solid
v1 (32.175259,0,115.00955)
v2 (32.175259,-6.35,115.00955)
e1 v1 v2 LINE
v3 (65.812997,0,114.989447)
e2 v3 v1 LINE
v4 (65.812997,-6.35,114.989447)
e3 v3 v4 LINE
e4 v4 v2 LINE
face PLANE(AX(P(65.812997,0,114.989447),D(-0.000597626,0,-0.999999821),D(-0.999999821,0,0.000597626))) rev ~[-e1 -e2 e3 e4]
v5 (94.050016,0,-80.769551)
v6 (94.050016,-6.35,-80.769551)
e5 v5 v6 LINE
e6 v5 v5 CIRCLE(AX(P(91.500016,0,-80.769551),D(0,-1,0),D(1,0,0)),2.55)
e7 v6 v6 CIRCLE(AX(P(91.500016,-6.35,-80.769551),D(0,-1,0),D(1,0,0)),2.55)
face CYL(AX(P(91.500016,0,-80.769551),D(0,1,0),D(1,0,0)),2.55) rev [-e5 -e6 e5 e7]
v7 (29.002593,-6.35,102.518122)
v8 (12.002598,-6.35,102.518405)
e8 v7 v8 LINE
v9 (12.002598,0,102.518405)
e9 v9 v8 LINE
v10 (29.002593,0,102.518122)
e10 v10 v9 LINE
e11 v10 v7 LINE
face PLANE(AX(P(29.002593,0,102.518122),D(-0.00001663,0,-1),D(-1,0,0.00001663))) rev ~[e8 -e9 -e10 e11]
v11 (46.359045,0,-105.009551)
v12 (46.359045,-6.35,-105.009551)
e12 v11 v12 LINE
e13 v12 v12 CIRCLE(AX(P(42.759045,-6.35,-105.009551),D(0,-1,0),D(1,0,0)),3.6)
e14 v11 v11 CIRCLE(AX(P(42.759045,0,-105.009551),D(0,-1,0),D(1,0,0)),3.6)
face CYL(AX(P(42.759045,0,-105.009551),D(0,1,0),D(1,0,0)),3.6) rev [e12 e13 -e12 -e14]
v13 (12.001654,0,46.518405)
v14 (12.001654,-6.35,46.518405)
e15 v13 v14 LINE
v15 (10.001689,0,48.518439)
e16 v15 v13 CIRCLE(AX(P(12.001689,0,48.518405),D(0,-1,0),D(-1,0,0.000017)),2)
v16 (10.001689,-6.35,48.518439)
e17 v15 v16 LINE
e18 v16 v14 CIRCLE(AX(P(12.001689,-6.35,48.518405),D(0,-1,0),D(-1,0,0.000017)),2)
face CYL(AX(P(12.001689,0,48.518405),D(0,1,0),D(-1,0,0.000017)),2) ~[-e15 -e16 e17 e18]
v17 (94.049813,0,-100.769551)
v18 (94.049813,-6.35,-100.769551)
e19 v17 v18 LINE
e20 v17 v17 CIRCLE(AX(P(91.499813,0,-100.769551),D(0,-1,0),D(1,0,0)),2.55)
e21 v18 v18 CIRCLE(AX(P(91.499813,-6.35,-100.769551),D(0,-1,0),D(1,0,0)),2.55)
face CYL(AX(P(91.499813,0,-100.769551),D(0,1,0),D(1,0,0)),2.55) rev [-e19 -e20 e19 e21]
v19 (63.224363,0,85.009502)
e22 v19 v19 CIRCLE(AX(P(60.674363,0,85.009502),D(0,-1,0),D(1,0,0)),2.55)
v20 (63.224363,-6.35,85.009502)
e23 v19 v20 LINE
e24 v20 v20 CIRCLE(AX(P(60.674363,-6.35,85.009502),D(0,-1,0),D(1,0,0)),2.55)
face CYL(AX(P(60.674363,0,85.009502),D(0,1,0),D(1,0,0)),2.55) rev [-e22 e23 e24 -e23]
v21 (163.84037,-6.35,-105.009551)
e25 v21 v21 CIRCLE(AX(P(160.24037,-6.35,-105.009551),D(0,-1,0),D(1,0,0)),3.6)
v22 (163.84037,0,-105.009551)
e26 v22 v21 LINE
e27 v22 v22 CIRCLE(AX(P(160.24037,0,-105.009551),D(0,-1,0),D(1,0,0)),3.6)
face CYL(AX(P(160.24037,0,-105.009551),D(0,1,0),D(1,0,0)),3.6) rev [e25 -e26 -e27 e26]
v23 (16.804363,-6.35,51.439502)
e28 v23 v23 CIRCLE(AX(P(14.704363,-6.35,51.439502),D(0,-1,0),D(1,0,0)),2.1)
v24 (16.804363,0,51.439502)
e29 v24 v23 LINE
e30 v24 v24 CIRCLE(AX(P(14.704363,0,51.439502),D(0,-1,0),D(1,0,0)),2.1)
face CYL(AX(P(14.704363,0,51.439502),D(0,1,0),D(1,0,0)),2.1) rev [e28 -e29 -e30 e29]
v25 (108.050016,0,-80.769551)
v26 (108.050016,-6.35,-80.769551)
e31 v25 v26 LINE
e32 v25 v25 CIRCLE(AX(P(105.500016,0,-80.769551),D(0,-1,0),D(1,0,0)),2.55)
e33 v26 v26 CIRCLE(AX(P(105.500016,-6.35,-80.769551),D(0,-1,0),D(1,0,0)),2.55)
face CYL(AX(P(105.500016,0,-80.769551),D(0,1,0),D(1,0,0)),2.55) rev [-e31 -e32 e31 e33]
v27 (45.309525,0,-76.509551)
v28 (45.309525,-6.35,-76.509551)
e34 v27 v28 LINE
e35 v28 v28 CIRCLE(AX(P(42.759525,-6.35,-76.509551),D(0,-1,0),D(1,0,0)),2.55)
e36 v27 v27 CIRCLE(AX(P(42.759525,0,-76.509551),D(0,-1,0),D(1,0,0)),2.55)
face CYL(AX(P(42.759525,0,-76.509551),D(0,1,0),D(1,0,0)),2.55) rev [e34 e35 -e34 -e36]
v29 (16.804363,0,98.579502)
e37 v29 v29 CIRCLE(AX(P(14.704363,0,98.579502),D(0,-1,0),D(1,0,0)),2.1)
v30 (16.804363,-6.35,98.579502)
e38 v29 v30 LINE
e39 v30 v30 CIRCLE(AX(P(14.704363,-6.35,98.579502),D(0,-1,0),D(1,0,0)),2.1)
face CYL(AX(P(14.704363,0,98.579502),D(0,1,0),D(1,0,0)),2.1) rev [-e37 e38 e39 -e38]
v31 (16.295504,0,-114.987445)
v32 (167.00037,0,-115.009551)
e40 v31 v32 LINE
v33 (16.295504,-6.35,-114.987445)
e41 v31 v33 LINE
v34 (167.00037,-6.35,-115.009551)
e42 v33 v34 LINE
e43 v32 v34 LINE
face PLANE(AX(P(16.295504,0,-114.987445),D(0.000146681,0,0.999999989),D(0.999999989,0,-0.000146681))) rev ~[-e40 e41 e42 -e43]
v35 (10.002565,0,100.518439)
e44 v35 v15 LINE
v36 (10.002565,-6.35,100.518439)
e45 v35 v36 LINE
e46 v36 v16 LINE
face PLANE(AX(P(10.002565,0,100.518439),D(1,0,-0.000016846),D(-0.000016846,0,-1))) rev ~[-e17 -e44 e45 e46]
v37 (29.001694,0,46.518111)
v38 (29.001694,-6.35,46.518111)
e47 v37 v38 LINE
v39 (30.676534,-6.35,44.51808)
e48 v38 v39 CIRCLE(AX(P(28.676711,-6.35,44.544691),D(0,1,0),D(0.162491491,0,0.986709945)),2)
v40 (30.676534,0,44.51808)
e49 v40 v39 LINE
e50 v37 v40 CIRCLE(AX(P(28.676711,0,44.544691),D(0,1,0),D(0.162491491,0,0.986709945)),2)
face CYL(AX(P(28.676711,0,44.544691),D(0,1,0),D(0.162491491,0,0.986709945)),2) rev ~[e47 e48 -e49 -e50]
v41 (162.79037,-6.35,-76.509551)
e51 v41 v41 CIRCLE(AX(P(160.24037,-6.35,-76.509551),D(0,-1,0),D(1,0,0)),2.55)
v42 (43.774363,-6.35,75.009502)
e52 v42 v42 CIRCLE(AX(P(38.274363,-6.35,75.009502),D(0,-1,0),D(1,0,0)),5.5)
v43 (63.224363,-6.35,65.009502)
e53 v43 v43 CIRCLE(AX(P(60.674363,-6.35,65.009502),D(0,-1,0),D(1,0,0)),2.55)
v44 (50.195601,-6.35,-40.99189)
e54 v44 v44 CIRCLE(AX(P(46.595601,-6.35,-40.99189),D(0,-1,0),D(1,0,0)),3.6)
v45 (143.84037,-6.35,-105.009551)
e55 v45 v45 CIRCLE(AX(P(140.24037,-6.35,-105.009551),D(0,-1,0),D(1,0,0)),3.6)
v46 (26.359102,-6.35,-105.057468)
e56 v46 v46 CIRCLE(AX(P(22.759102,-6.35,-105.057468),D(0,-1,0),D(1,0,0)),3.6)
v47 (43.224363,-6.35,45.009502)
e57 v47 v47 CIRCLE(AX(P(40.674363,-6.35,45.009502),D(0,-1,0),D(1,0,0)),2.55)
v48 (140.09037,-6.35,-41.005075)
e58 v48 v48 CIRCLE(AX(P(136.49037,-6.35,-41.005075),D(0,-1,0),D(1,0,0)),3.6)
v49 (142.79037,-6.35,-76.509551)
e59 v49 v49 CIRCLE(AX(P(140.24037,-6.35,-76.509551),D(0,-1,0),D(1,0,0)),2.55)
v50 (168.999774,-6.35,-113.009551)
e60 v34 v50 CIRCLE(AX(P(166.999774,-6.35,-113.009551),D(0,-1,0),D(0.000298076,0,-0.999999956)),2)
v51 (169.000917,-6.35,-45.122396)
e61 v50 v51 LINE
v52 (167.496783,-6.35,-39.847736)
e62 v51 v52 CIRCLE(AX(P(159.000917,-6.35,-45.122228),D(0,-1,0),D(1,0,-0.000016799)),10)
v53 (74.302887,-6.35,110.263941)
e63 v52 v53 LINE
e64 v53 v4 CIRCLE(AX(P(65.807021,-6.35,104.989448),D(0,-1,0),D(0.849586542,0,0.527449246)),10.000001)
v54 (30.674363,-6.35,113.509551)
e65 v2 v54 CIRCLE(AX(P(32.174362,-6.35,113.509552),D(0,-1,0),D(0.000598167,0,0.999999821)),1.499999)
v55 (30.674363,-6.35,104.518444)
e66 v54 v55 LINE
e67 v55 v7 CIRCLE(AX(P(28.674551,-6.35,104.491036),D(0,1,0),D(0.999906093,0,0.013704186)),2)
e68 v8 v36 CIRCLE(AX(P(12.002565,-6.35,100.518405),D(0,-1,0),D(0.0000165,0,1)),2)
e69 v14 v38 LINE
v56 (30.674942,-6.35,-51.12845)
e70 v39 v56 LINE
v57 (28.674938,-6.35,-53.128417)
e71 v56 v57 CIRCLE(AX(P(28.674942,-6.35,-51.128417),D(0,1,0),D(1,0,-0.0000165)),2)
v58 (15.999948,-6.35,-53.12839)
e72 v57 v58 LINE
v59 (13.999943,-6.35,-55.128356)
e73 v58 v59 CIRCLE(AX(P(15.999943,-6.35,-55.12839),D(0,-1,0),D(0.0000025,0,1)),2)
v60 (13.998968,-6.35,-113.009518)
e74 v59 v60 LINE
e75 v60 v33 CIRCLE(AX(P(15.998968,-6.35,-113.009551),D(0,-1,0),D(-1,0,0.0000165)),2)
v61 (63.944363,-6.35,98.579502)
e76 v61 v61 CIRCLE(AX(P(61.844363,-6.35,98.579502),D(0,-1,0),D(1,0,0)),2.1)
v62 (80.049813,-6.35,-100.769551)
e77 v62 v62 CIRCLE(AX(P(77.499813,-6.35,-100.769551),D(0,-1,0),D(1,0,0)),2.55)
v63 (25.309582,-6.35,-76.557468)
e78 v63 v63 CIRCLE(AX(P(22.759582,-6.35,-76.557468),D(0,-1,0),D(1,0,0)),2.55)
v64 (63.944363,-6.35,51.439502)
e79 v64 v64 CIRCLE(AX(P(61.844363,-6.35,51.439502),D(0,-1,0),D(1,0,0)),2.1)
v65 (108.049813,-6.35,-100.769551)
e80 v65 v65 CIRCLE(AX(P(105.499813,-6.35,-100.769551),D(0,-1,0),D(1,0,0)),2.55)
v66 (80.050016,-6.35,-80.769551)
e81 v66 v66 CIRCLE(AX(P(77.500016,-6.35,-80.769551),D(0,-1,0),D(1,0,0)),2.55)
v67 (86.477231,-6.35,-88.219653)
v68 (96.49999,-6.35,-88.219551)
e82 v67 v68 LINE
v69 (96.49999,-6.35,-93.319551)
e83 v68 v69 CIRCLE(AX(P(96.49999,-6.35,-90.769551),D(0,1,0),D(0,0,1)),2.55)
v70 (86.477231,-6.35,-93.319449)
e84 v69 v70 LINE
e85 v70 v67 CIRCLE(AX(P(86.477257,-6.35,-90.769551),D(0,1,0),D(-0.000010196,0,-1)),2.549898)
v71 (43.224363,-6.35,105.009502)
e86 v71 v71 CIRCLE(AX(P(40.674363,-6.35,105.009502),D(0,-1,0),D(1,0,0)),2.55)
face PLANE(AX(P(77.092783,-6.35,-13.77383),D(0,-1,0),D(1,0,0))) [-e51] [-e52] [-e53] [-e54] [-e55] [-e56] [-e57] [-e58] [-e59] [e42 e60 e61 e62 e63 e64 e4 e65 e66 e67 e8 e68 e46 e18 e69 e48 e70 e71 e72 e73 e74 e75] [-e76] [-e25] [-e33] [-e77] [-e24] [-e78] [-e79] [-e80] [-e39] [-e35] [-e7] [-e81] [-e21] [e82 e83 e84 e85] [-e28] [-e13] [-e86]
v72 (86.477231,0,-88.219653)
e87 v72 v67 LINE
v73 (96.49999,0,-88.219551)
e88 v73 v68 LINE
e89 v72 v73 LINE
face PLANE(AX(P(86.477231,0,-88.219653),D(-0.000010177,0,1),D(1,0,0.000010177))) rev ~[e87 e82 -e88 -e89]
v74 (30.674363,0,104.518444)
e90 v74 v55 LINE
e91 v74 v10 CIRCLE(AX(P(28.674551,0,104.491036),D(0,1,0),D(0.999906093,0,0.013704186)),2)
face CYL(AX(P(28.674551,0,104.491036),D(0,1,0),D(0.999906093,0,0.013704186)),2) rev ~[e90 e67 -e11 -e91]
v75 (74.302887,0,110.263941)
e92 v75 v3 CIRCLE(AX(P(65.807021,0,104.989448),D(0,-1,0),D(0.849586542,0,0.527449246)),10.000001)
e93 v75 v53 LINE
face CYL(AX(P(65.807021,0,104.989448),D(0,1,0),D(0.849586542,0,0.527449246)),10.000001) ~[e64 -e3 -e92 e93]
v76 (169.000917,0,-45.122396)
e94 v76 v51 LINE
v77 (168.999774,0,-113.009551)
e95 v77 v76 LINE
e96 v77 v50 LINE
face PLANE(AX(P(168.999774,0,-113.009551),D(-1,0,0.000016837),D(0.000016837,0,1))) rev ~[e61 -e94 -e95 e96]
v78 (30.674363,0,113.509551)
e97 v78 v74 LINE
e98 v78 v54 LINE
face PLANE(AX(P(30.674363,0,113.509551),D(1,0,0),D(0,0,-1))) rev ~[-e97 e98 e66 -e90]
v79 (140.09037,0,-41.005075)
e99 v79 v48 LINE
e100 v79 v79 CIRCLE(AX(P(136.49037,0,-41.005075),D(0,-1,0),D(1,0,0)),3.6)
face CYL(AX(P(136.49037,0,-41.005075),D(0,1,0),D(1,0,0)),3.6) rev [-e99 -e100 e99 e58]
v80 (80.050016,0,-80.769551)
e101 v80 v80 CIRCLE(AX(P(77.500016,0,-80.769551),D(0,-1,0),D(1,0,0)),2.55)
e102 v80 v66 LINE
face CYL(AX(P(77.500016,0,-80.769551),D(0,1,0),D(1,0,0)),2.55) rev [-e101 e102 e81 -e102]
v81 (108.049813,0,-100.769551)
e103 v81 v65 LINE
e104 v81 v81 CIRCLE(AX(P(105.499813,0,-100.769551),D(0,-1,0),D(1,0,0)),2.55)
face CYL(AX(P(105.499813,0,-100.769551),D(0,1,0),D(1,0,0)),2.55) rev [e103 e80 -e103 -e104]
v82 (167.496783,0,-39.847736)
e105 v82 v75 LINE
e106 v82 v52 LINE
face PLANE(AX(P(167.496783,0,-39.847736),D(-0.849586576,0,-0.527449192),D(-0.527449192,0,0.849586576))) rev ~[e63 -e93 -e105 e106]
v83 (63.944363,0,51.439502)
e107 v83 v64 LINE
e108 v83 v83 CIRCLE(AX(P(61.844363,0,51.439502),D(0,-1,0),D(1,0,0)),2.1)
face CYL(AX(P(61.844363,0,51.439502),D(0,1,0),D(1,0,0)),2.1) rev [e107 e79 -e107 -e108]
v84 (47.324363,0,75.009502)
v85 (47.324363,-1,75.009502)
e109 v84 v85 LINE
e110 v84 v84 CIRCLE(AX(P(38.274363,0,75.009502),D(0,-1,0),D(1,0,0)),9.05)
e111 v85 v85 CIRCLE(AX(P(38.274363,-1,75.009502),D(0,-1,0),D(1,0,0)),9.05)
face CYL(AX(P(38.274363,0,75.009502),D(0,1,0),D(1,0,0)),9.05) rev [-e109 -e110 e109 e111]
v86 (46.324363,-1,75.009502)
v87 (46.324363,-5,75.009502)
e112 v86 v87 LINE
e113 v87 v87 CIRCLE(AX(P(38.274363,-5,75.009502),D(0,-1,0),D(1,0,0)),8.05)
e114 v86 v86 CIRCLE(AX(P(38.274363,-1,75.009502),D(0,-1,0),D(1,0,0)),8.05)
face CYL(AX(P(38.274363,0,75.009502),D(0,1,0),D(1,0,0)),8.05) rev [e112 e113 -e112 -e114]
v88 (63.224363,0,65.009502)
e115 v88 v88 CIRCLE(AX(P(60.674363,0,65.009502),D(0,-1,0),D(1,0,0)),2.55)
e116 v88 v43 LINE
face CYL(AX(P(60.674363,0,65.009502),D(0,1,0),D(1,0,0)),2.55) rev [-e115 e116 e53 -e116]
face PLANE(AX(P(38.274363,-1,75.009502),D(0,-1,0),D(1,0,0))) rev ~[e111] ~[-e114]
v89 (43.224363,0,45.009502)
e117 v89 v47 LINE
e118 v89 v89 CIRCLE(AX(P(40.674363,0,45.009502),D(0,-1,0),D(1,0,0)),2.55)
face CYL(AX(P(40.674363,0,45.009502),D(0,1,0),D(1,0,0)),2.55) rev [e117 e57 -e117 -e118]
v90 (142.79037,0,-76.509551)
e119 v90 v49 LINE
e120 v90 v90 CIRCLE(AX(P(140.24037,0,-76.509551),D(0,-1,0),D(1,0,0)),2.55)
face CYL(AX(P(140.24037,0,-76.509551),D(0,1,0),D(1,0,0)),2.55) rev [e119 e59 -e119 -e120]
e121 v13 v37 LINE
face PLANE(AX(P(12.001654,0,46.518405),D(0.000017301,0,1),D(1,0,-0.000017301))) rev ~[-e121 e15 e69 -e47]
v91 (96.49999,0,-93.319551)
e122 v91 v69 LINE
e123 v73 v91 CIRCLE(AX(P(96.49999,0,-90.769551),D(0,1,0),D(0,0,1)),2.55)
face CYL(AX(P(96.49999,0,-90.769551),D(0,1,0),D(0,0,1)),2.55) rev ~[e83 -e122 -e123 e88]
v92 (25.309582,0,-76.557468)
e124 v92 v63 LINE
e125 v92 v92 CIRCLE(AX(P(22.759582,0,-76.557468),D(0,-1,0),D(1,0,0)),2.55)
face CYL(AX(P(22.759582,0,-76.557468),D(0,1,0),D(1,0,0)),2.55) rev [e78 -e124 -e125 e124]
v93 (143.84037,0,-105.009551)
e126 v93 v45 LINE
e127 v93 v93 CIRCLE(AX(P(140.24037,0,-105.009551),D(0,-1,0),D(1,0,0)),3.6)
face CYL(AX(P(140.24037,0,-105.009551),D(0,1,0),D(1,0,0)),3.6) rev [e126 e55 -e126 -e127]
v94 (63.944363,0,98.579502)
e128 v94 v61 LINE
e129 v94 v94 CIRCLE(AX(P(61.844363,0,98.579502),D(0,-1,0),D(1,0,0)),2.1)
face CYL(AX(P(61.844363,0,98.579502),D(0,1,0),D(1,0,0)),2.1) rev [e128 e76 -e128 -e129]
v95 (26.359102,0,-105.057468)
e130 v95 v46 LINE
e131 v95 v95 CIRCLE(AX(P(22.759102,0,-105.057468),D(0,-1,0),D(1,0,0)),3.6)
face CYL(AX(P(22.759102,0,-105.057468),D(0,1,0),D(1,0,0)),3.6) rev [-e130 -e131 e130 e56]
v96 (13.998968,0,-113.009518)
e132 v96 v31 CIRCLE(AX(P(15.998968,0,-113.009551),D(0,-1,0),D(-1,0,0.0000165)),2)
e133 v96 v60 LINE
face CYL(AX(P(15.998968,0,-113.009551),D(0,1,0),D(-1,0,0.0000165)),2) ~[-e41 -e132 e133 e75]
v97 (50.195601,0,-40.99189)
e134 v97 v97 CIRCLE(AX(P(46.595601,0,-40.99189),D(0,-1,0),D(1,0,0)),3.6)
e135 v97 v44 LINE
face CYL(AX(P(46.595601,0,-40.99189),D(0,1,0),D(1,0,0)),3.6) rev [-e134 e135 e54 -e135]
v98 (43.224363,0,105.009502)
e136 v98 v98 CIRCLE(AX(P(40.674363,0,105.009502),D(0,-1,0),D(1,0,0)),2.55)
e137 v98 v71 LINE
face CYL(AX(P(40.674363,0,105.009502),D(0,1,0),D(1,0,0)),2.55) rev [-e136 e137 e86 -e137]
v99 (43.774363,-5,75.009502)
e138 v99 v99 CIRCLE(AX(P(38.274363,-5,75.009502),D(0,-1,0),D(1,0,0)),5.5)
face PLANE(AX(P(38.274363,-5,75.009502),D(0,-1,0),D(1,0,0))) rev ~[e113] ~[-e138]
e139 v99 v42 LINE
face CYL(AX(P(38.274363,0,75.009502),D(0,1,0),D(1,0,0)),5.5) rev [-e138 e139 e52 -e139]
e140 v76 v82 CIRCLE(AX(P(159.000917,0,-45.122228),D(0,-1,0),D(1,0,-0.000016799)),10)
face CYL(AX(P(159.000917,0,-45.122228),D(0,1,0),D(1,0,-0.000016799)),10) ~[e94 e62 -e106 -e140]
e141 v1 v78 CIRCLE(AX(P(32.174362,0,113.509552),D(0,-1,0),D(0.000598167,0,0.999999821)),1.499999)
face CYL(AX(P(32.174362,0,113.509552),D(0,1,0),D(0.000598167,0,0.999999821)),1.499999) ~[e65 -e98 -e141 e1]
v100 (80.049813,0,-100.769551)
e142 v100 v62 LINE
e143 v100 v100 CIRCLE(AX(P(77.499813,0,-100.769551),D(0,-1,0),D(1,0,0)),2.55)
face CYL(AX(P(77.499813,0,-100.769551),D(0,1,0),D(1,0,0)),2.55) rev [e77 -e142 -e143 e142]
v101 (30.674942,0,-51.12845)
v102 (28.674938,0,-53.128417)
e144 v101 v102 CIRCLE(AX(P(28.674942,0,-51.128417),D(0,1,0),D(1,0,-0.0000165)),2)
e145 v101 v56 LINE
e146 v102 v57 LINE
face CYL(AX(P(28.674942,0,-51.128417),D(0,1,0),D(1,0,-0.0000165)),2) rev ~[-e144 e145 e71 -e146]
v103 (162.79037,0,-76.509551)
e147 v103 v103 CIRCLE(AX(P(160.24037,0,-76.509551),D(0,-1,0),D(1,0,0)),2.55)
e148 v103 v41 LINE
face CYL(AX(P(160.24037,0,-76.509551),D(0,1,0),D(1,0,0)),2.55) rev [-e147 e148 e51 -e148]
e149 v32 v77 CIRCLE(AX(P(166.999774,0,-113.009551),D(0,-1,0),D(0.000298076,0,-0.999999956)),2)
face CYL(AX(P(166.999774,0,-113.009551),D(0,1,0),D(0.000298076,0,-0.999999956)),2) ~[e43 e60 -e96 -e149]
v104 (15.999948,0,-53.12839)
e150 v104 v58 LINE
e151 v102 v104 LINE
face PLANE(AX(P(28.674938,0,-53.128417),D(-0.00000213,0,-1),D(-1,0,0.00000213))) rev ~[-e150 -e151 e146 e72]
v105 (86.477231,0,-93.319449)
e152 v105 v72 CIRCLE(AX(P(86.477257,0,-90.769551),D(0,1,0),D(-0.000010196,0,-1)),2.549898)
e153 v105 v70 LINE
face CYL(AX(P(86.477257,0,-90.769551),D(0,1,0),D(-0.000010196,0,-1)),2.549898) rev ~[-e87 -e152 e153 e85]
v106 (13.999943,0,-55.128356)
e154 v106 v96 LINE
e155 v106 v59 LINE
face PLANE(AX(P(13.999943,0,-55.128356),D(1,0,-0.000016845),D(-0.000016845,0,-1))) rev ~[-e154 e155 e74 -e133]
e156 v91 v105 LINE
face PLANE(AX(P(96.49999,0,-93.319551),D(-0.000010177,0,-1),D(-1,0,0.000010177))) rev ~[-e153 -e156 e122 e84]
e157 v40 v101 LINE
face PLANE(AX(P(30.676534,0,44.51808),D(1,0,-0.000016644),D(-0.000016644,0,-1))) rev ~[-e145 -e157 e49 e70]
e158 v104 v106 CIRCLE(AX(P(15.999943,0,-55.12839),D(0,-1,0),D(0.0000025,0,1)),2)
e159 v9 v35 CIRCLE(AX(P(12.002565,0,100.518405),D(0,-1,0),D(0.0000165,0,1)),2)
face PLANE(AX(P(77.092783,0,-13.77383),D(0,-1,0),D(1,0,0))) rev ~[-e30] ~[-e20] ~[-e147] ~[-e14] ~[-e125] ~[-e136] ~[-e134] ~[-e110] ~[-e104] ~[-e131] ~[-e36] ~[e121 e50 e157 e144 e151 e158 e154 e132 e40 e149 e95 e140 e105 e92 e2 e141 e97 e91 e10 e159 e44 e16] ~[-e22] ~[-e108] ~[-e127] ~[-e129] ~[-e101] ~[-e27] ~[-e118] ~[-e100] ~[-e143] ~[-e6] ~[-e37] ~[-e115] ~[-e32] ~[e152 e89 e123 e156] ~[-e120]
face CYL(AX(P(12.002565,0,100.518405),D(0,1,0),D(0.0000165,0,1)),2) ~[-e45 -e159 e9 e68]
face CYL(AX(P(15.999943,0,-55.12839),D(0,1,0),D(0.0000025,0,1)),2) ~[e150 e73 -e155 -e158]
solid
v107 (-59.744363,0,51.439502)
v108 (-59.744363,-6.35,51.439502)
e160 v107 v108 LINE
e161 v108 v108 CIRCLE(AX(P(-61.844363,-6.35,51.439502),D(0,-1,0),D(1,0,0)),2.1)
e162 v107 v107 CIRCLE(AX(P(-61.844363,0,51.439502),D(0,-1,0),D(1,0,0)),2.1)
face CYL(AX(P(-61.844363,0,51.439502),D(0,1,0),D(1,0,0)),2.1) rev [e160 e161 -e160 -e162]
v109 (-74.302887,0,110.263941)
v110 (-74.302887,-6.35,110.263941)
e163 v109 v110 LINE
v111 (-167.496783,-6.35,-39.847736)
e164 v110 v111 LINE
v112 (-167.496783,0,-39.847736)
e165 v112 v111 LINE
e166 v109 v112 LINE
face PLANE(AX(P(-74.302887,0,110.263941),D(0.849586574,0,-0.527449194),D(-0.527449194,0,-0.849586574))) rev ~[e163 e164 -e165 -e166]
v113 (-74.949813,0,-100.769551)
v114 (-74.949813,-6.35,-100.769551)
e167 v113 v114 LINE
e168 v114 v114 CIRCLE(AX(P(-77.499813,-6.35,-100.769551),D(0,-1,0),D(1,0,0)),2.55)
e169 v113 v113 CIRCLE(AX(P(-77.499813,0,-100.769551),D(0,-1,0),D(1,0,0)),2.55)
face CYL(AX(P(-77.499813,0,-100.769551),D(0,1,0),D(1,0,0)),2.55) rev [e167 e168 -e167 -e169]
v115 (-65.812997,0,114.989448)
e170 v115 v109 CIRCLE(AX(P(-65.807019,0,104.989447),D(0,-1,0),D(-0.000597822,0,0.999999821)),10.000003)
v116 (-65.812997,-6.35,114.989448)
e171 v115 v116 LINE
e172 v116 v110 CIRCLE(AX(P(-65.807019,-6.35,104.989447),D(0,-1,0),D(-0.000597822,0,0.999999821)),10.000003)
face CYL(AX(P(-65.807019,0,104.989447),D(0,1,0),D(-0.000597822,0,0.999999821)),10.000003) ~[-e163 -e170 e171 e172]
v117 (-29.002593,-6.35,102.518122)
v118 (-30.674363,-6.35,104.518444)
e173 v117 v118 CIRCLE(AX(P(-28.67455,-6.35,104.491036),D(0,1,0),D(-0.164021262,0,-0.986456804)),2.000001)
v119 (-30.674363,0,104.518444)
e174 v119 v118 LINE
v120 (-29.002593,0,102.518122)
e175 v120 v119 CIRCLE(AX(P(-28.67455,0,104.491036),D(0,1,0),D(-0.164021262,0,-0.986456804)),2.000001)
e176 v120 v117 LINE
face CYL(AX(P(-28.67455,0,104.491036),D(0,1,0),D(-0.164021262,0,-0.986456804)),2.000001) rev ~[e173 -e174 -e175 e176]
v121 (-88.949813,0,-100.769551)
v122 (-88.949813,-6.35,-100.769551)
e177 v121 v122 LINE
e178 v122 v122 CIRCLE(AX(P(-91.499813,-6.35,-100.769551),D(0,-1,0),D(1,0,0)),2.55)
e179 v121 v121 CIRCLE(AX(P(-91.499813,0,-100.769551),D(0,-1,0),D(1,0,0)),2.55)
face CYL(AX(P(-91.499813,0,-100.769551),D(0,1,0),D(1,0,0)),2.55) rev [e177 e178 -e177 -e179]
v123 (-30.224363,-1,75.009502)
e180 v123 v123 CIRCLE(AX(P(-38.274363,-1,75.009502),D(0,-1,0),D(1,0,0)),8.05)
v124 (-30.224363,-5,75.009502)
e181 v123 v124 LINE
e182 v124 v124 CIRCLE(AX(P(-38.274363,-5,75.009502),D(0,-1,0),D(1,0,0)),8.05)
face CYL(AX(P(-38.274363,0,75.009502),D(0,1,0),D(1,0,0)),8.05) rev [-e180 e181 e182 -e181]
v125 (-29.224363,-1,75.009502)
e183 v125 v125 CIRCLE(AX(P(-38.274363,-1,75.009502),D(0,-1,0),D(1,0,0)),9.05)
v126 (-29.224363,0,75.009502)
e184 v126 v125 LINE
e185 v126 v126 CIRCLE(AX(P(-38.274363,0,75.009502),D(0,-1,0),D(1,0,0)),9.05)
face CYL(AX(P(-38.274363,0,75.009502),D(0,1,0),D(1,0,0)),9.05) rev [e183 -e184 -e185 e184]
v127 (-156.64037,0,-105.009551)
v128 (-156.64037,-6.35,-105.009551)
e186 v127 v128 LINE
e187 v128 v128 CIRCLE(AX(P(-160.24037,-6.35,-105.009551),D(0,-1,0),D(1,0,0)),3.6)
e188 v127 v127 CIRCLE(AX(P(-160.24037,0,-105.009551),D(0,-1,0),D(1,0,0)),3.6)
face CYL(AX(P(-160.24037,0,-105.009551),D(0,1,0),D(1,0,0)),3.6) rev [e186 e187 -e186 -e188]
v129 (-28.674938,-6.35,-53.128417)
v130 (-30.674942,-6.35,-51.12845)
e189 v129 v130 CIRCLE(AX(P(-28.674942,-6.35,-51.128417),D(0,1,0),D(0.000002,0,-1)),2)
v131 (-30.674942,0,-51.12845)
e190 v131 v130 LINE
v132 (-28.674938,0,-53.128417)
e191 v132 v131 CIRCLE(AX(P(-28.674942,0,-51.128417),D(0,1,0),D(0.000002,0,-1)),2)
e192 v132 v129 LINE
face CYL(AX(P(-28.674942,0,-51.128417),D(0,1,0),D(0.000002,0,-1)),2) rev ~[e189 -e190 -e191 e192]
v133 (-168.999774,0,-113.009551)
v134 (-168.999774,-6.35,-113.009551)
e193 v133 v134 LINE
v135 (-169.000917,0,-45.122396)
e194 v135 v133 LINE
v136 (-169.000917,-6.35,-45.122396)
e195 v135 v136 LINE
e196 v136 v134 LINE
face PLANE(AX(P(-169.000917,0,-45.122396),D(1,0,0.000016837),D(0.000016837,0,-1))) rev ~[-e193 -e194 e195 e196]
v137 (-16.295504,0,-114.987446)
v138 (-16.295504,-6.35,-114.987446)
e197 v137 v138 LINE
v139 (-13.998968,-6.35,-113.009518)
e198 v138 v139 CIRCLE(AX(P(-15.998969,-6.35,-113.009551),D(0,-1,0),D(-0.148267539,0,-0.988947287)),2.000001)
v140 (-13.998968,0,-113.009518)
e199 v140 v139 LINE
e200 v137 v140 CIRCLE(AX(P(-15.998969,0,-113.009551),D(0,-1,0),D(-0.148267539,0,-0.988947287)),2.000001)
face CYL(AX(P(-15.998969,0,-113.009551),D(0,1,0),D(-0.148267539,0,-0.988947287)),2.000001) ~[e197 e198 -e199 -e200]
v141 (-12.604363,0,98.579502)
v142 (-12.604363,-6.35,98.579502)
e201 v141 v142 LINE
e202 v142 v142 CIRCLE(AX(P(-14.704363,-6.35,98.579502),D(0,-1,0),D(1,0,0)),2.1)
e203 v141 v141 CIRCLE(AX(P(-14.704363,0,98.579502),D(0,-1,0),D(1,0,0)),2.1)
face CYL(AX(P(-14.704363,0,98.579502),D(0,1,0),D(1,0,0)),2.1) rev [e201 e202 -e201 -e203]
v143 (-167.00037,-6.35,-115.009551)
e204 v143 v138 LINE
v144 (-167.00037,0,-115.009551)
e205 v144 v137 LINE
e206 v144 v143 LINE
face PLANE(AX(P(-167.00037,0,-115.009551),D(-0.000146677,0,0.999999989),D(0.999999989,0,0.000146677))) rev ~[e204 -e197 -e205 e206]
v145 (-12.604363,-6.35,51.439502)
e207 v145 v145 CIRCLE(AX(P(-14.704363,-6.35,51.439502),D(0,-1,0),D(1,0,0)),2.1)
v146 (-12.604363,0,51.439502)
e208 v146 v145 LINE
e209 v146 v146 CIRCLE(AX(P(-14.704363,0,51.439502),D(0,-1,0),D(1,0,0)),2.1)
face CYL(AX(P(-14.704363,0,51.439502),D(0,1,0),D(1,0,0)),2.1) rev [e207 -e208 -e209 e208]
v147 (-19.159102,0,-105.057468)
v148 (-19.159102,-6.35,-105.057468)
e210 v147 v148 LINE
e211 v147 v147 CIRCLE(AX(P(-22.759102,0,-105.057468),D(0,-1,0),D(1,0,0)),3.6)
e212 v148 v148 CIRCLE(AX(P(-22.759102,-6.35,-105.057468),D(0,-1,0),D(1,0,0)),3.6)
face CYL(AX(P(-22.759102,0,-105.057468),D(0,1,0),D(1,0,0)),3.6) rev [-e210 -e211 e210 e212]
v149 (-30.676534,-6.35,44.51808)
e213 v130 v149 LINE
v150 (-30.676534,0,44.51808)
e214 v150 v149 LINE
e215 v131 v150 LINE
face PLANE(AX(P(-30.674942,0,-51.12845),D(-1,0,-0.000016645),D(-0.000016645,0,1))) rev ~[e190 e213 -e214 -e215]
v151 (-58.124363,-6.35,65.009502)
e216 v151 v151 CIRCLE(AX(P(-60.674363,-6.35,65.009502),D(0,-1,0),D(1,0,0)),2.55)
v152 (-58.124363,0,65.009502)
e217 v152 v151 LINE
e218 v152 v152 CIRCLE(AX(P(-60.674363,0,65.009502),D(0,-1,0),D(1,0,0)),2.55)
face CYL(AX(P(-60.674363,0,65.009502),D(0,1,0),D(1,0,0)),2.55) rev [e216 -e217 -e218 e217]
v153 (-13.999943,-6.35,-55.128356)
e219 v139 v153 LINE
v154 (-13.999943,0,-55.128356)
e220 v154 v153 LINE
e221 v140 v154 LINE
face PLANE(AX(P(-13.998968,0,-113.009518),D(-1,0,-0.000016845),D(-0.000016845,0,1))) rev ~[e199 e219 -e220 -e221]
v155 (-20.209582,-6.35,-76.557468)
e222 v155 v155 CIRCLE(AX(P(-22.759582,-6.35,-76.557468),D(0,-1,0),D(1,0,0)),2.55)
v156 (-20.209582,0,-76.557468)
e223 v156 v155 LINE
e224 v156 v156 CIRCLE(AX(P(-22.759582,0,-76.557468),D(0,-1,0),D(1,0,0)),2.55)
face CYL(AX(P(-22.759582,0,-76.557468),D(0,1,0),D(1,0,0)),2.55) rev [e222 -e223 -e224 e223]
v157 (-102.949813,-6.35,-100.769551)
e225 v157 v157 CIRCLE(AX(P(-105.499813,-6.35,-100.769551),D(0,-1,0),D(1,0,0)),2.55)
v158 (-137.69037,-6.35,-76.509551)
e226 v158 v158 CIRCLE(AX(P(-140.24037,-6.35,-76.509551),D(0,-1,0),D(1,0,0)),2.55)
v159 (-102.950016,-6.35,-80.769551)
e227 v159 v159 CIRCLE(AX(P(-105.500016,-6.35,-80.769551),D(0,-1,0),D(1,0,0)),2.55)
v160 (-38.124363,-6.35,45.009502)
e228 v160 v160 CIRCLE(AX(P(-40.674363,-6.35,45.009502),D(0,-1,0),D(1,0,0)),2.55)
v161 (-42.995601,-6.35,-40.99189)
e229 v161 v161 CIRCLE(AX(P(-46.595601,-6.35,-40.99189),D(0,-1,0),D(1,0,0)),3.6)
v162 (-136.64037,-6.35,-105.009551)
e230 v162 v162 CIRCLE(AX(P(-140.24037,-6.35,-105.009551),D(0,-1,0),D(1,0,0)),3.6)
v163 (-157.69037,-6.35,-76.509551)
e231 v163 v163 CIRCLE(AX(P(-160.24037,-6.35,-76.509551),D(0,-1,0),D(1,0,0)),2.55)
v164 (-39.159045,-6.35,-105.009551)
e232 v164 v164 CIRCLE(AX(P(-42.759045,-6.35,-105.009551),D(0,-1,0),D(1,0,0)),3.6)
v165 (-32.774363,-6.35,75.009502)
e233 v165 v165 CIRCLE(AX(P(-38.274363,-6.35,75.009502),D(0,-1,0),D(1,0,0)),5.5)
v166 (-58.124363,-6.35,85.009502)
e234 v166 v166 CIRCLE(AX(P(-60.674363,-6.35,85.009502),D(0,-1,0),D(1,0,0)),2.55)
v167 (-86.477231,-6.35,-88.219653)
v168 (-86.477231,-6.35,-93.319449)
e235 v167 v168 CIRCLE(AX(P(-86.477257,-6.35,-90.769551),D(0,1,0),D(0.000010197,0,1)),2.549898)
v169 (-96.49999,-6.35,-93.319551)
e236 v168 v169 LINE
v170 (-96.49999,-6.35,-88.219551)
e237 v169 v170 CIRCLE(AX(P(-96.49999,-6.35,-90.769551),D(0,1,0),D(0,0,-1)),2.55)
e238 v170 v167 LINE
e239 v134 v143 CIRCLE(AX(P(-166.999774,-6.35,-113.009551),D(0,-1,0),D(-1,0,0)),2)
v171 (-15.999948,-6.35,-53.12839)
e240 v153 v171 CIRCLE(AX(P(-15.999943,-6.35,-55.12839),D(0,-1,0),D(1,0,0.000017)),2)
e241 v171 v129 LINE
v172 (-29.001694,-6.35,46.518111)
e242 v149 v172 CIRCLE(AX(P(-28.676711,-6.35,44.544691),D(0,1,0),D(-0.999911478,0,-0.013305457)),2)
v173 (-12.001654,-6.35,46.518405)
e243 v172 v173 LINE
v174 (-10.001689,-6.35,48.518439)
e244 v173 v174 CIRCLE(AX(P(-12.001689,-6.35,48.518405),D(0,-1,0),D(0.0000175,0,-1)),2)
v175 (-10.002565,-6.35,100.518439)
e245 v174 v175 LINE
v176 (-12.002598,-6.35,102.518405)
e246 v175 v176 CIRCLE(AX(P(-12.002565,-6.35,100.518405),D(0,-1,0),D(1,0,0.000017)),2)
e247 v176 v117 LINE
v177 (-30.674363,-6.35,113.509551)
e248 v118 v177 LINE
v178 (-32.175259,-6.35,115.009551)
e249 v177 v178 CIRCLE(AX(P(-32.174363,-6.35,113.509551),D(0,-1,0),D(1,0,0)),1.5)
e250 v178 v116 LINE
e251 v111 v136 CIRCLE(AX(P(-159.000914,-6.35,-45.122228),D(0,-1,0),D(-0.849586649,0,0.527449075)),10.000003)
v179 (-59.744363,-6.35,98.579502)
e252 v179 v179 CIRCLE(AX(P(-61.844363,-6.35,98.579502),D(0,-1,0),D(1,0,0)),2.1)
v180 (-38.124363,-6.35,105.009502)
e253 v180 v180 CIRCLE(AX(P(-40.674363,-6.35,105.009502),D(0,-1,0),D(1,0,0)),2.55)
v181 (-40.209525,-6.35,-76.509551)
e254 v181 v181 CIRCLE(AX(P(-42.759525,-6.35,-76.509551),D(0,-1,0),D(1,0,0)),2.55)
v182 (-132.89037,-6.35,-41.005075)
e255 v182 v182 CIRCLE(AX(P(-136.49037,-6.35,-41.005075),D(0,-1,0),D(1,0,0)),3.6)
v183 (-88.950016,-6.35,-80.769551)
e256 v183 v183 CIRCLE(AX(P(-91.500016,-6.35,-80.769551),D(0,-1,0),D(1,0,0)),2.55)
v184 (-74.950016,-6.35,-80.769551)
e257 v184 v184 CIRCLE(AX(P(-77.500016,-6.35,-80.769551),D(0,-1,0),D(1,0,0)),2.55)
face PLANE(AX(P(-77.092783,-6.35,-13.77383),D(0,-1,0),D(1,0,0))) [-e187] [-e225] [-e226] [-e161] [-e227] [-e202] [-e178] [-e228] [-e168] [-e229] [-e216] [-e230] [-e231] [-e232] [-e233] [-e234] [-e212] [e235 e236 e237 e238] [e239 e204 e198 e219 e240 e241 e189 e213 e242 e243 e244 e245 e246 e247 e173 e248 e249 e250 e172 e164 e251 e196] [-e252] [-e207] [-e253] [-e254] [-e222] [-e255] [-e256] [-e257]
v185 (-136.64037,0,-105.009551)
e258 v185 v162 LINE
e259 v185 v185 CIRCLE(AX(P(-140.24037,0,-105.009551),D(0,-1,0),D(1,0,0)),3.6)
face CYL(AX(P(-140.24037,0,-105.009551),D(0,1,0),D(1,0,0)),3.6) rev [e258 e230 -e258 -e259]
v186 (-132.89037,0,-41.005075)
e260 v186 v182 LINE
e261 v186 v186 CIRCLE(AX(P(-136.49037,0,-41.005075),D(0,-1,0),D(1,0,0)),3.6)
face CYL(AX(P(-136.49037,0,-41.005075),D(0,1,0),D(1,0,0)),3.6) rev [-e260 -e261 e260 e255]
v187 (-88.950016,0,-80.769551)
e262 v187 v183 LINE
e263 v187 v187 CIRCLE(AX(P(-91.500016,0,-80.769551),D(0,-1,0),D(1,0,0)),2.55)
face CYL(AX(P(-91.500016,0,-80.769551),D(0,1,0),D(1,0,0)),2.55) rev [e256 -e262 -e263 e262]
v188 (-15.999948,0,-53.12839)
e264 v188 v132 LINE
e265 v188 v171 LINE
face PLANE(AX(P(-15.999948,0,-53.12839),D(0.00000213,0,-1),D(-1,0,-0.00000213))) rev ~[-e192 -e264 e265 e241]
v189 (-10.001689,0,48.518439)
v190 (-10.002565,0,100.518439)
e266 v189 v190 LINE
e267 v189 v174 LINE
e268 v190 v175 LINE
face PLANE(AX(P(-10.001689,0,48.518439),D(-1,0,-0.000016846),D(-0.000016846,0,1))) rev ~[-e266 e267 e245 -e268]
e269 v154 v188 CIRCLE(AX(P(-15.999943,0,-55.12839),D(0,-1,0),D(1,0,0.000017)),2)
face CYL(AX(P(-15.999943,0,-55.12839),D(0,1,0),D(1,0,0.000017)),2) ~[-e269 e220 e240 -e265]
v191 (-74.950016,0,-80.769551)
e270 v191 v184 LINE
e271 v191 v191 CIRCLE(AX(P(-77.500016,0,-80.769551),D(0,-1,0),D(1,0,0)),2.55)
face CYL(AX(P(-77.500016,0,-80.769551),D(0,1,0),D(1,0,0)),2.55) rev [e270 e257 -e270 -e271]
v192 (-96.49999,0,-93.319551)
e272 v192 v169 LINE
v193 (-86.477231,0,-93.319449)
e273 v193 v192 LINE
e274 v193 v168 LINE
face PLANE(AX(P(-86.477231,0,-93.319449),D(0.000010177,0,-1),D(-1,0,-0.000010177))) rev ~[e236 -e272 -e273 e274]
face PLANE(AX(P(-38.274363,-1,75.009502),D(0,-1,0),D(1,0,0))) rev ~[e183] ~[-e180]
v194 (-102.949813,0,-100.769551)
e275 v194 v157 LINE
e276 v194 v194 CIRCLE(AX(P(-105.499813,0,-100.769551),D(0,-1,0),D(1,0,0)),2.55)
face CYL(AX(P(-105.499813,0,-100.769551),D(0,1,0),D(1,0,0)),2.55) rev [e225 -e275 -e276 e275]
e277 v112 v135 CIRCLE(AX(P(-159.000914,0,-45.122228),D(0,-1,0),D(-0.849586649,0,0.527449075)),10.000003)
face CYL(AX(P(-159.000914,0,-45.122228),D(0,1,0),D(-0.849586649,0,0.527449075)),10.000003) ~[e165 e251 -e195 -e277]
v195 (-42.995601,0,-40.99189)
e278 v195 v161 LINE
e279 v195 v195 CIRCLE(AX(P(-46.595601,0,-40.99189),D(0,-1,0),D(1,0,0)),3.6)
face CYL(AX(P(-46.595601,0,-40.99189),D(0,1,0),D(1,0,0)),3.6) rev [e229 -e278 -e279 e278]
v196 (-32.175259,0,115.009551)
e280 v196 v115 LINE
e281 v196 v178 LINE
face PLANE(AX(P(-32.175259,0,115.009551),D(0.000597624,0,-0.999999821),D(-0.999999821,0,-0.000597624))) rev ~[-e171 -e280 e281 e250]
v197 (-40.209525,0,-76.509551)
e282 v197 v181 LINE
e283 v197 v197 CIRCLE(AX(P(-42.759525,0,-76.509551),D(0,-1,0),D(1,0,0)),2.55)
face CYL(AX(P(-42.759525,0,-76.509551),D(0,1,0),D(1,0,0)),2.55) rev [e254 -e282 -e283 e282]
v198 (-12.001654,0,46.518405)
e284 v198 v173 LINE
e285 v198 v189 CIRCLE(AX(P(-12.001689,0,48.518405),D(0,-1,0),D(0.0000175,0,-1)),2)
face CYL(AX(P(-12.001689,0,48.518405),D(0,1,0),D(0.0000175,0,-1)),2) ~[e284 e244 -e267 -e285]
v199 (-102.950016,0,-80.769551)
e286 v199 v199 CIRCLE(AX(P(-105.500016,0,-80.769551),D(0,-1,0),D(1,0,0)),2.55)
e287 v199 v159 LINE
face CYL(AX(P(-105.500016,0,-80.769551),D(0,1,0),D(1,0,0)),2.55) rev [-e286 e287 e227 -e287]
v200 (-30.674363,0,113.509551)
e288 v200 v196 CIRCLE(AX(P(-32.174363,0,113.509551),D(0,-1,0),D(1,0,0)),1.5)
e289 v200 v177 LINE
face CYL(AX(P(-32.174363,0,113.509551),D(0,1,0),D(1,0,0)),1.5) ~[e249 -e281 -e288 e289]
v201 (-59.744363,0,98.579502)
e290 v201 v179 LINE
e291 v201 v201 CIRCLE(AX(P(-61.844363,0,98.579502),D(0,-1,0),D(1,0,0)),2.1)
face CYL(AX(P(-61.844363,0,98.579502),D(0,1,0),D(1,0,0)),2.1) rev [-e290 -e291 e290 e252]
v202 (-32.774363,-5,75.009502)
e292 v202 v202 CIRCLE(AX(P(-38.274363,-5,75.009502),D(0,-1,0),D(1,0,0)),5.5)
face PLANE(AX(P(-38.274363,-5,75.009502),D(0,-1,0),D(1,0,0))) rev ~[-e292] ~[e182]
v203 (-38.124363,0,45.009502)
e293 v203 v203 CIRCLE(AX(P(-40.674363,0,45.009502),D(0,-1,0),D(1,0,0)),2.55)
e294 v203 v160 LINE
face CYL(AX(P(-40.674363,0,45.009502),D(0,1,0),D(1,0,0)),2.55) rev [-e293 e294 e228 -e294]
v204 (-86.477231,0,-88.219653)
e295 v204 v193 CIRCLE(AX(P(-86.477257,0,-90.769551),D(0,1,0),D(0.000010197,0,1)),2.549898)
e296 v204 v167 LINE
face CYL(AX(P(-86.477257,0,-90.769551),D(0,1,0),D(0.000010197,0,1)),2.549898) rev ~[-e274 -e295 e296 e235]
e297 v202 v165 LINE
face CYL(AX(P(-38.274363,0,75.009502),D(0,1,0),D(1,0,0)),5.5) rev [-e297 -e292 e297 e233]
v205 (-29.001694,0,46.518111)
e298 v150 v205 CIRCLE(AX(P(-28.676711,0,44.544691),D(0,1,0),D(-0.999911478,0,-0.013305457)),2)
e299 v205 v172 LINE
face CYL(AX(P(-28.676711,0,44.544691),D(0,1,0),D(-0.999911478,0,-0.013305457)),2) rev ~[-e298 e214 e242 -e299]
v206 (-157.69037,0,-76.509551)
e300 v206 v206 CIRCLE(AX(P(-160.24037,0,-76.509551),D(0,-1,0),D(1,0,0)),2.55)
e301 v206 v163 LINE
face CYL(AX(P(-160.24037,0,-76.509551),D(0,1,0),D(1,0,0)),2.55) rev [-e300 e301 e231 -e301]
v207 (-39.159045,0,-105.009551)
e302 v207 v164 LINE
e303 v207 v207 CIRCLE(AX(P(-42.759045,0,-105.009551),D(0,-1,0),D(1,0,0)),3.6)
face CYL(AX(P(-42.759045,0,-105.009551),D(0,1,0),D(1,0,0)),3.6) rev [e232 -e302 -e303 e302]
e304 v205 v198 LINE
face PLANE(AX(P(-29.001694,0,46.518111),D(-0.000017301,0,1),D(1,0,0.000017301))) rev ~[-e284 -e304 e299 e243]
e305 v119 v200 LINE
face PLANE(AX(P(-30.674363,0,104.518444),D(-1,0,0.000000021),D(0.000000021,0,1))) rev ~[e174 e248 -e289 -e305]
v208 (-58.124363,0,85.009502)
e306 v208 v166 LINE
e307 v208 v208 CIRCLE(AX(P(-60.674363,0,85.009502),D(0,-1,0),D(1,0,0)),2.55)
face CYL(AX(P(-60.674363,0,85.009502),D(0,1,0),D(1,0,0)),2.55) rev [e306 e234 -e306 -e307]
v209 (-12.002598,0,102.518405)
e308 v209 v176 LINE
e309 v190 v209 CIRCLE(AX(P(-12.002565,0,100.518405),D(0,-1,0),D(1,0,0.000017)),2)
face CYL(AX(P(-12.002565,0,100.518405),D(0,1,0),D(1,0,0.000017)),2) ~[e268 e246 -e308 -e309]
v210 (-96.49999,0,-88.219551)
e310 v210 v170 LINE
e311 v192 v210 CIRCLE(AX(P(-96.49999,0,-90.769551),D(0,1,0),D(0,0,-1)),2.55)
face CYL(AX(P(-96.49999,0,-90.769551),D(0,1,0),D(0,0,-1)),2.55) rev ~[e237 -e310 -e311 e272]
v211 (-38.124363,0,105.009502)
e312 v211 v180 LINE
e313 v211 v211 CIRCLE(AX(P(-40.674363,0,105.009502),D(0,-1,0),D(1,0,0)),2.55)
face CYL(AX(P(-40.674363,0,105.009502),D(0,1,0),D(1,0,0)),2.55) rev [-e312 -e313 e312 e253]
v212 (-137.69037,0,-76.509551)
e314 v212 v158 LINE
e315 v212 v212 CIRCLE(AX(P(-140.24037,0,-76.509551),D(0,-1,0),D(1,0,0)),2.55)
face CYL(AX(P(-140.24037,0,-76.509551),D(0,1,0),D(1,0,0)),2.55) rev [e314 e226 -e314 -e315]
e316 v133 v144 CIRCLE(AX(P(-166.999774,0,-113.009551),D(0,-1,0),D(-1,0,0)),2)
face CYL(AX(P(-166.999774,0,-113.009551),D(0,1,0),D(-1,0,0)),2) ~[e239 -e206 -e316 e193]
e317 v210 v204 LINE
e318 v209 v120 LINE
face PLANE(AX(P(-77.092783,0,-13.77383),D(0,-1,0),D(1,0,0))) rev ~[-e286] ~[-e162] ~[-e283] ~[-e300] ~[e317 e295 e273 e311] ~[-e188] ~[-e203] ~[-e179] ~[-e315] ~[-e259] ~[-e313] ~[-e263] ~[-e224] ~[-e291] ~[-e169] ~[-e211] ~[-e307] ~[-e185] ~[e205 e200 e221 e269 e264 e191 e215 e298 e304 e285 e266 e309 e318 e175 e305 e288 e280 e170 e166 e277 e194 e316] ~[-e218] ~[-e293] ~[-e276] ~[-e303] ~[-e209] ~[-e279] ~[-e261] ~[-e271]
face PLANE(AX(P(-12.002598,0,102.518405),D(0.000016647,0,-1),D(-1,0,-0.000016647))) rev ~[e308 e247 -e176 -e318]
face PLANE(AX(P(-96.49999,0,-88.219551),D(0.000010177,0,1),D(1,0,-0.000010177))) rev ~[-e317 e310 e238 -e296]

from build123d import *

# Parameters (mm, degrees)
F0_R     = 3.6
F0_R_2   = 2.55
F0_R_3   = 2.1
F0_R_4   = 9.05
F0_R_5   = 8.05
F0_R_6   = 5.5
F1_DEPTH = 6.35
F2_DEPTH = 5
F3_DEPTH = 1
F4_DEPTH = 6.35
F5_DEPTH = 5
F6_DEPTH = 1


# Not quite as in the source:
# - ends of sketch curves that miss each other by under 0.0002 mm in the source are joined


with BuildPart() as f1:
    # F0 (on Front) → F1 (new body)
    with BuildSketch(Plane.XZ):
        with BuildLine():
            Line((-30.674942, -51.12845), (-30.676534, 44.51808))
            ThreePointArc((-30.676534, 44.51808), (-30.2100770853, 45.8287425755), (-29.0016939819, 46.5181108898))
            Line((-29.0016939819, 46.5181108898), (-12.001654, 46.518405))
            ThreePointArc((-12.001654, 46.518405), (-10.5874510427, 47.104215833), (-10.0016890003, 48.518439))
            Line((-10.0016890003, 48.518439), (-10.002565, 100.518439))
            ThreePointArc((-10.002565, 100.518439), (-10.5883751259, 101.9326422503), (-12.002598, 102.5184049997))
            Line((-12.002598, 102.5184049997), (-29.002593, 102.518122))
            ThreePointArc((-29.002593, 102.518122), (-30.2091675508, 103.2084791623), (-30.6743631915, 104.5184440026))
            Line((-30.6743631915, 104.5184440026), (-30.674363, 113.509551))
            ThreePointArc((-30.674363, 113.509551), (-31.1140196595, 114.5705279085), (-32.1752590004, 115.0095507324))
            Line((-32.1752590004, 115.0095507324), (-65.812997, 114.989448))
            ThreePointArc((-65.812997, 114.989448), (-70.670448907, 113.7271299849), (-74.3028867898, 110.2639408695))
            Line((-74.3028867898, 110.2639408695), (-167.496783, -39.847736))
            ThreePointArc((-167.496783, -39.847736), (-168.6175573697, -42.3799245887), (-169.0009169986, -45.122396))
            Line((-169.0009169986, -45.122396), (-168.999774, -113.009551))
            ThreePointArc((-168.999774, -113.009551), (-168.4141982645, -114.4235538289), (-167.00037, -115.0095509112))
            Line((-167.00037, -115.0095509112), (-16.295504, -114.987446))
            ThreePointArc((-16.295504, -114.987446), (-14.6937872777, -114.5249728165), (-13.9989680003, -113.009518))
            Line((-13.9989680003, -113.009518), (-13.999943, -55.128356))
            ThreePointArc((-13.999943, -55.128356), (-14.5857432263, -53.7141626491), (-15.999948, -53.12839))
            Line((-15.999948, -53.12839), (-28.674938, -53.128417))
            ThreePointArc((-28.674938, -53.128417), (-30.0891424808, -52.5426436438), (-30.674942, -51.12845))
        make_face()
        with Locations((-160.24037, -105.009551)):
            Circle(F0_R, mode=Mode.SUBTRACT)
        with Locations((-140.24037, -105.009551)):
            Circle(F0_R, mode=Mode.SUBTRACT)
        with Locations((-105.499813, -100.769551)):
            Circle(F0_R_2, mode=Mode.SUBTRACT)
        with Locations((-91.499813, -100.769551)):
            Circle(F0_R_2, mode=Mode.SUBTRACT)
        with BuildLine():
            Line((-96.49999, -88.219551), (-86.477231, -88.219653))
            ThreePointArc((-86.477231, -88.219653), (-83.927359, -90.769551), (-86.477231, -93.3194489999))
            Line((-86.477231, -93.3194489999), (-96.49999, -93.319551))
            ThreePointArc((-96.49999, -93.319551), (-99.04999, -90.769551), (-96.49999, -88.219551))
        make_face(mode=Mode.SUBTRACT)
        with Locations((-160.24037, -76.509551)):
            Circle(F0_R_2, mode=Mode.SUBTRACT)
        with Locations((-140.24037, -76.509551)):
            Circle(F0_R_2, mode=Mode.SUBTRACT)
        with Locations((-105.500016, -80.769551)):
            Circle(F0_R_2, mode=Mode.SUBTRACT)
        with Locations((-91.500016, -80.769551)):
            Circle(F0_R_2, mode=Mode.SUBTRACT)
        with Locations((-77.499813, -100.769551)):
            Circle(F0_R_2, mode=Mode.SUBTRACT)
        with Locations((-42.759045, -105.009551)):
            Circle(F0_R, mode=Mode.SUBTRACT)
        with Locations((-22.759102, -105.057468)):
            Circle(F0_R, mode=Mode.SUBTRACT)
        with Locations((-77.500016, -80.769551)):
            Circle(F0_R_2, mode=Mode.SUBTRACT)
        with Locations((-42.759525, -76.509551)):
            Circle(F0_R_2, mode=Mode.SUBTRACT)
        with Locations((-22.759582, -76.557468)):
            Circle(F0_R_2, mode=Mode.SUBTRACT)
        with Locations((-136.49037, -41.005075)):
            Circle(F0_R, mode=Mode.SUBTRACT)
        with Locations((-46.595601, -40.99189)):
            Circle(F0_R, mode=Mode.SUBTRACT)
        with Locations((-61.844363, 51.439502)):
            Circle(F0_R_3, mode=Mode.SUBTRACT)
        with Locations((-40.674363, 45.009502)):
            Circle(F0_R_2, mode=Mode.SUBTRACT)
        with Locations((-14.704363, 51.439502)):
            Circle(F0_R_3, mode=Mode.SUBTRACT)
        with Locations((-60.674363, 65.009502)):
            Circle(F0_R_2, mode=Mode.SUBTRACT)
        with Locations((-60.674363, 85.009502)):
            Circle(F0_R_2, mode=Mode.SUBTRACT)
        with Locations((-38.274363, 75.009502)):
            Circle(F0_R_4, mode=Mode.SUBTRACT)
        with Locations((-61.844363, 98.579502)):
            Circle(F0_R_3, mode=Mode.SUBTRACT)
        with Locations((-14.704363, 98.579502)):
            Circle(F0_R_3, mode=Mode.SUBTRACT)
        with Locations((-40.674363, 105.009502)):
            Circle(F0_R_2, mode=Mode.SUBTRACT)
        with Locations((-38.274363, 75.009502)):
            Circle(F0_R_4)
        with Locations((-38.274363, 75.009502)):
            Circle(F0_R_5, mode=Mode.SUBTRACT)
        with Locations((-38.274363, 75.009502)):
            Circle(F0_R_5)
        with Locations((-38.274363, 75.009502)):
            Circle(F0_R_6, mode=Mode.SUBTRACT)
    extrude(amount=F1_DEPTH)

    # F0 (on Front) → F2 (cut)
    with BuildSketch(Plane.XZ):
        with Locations((-38.274363, 75.009502)):
            Circle(F0_R_5)
        with Locations((-38.274363, 75.009502)):
            Circle(F0_R_6, mode=Mode.SUBTRACT)
    extrude(amount=F2_DEPTH, mode=Mode.SUBTRACT)

    # F0 (on Front) → F3 (cut)
    with BuildSketch(Plane.XZ):
        with Locations((-38.274363, 75.009502)):
            Circle(F0_R_4)
        with Locations((-38.274363, 75.009502)):
            Circle(F0_R_5, mode=Mode.SUBTRACT)
    extrude(amount=F3_DEPTH, mode=Mode.SUBTRACT)


with BuildPart() as f4:
    # F0 (on Front) → F4 (new body)
    with BuildSketch(Plane.XZ):
        with BuildLine():
            ThreePointArc((29.0016939819, 46.5181108898), (30.2100770853, 45.8287425755), (30.6765339558, 44.5180800006))
            Line((30.6765339558, 44.5180800006), (30.674942, -51.12845))
            ThreePointArc((30.674942, -51.12845), (30.0891424808, -52.5426436438), (28.674938, -53.128417))
            Line((28.674938, -53.128417), (15.999948, -53.12839))
            ThreePointArc((15.999948, -53.12839), (14.5857432263, -53.7141626491), (13.9999430003, -55.128356))
            Line((13.9999430003, -55.128356), (13.998968, -113.009518))
            ThreePointArc((13.998968, -113.009518), (14.6937872777, -114.5249728165), (16.2955039173, -114.9874454486))
            Line((16.2955039173, -114.9874454486), (167.00037, -115.009551))
            ThreePointArc((167.00037, -115.009551), (168.4141982645, -114.4235538289), (168.999774, -113.009551))
            Line((168.999774, -113.009551), (169.000917, -45.122396))
            ThreePointArc((169.000917, -45.122396), (168.6175573697, -42.3799245887), (167.4967827898, -39.8477361305))
            Line((167.4967827898, -39.8477361305), (74.302887, 110.263941))
            ThreePointArc((74.302887, 110.263941), (70.670448907, 113.7271299849), (65.8129969995, 114.9894472144))
            Line((65.8129969995, 114.9894472144), (32.175259, 115.00955))
            ThreePointArc((32.175259, 115.00955), (31.1140196595, 114.5705279085), (30.674363, 113.509551))
            Line((30.674363, 113.509551), (30.674363, 104.518444))
            ThreePointArc((30.674363, 104.518444), (30.2091675508, 103.2084791623), (29.0025929506, 102.5181222972))
            Line((29.0025929506, 102.5181222972), (12.002598, 102.518405))
            ThreePointArc((12.002598, 102.518405), (10.5883751259, 101.9326422503), (10.0025650003, 100.518439))
            Line((10.0025650003, 100.518439), (10.001689, 48.518439))
            ThreePointArc((10.001689, 48.518439), (10.5874510427, 47.104215833), (12.001654, 46.5184050003))
            Line((12.001654, 46.5184050003), (29.0016939819, 46.5181108898))
        make_face()
        with Locations((22.759102, -105.057468)):
            Circle(F0_R, mode=Mode.SUBTRACT)
        with Locations((42.759045, -105.009551)):
            Circle(F0_R, mode=Mode.SUBTRACT)
        with Locations((77.499813, -100.769551)):
            Circle(F0_R_2, mode=Mode.SUBTRACT)
        with Locations((22.759582, -76.557468)):
            Circle(F0_R_2, mode=Mode.SUBTRACT)
        with Locations((42.759525, -76.509551)):
            Circle(F0_R_2, mode=Mode.SUBTRACT)
        with Locations((77.500016, -80.769551)):
            Circle(F0_R_2, mode=Mode.SUBTRACT)
        with Locations((91.499813, -100.769551)):
            Circle(F0_R_2, mode=Mode.SUBTRACT)
        with Locations((105.499813, -100.769551)):
            Circle(F0_R_2, mode=Mode.SUBTRACT)
        with BuildLine():
            ThreePointArc((86.477231, -93.3194489999), (83.927359, -90.769551), (86.477231, -88.2196530001))
            Line((86.477231, -88.2196530001), (96.49999, -88.219551))
            ThreePointArc((96.49999, -88.219551), (99.04999, -90.769551), (96.49999, -93.319551))
            Line((96.49999, -93.319551), (86.477231, -93.3194489999))
        make_face(mode=Mode.SUBTRACT)
        with Locations((140.24037, -105.009551)):
            Circle(F0_R, mode=Mode.SUBTRACT)
        with Locations((160.24037, -105.009551)):
            Circle(F0_R, mode=Mode.SUBTRACT)
        with Locations((91.500016, -80.769551)):
            Circle(F0_R_2, mode=Mode.SUBTRACT)
        with Locations((105.500016, -80.769551)):
            Circle(F0_R_2, mode=Mode.SUBTRACT)
        with Locations((140.24037, -76.509551)):
            Circle(F0_R_2, mode=Mode.SUBTRACT)
        with Locations((160.24037, -76.509551)):
            Circle(F0_R_2, mode=Mode.SUBTRACT)
        with Locations((46.595601, -40.99189)):
            Circle(F0_R, mode=Mode.SUBTRACT)
        with Locations((136.49037, -41.005075)):
            Circle(F0_R, mode=Mode.SUBTRACT)
        with Locations((14.704363, 51.439502)):
            Circle(F0_R_3, mode=Mode.SUBTRACT)
        with Locations((40.674363, 45.009502)):
            Circle(F0_R_2, mode=Mode.SUBTRACT)
        with Locations((61.844363, 51.439502)):
            Circle(F0_R_3, mode=Mode.SUBTRACT)
        with Locations((38.274363, 75.009502)):
            Circle(F0_R_4, mode=Mode.SUBTRACT)
        with Locations((60.674363, 65.009502)):
            Circle(F0_R_2, mode=Mode.SUBTRACT)
        with Locations((60.674363, 85.009502)):
            Circle(F0_R_2, mode=Mode.SUBTRACT)
        with Locations((14.704363, 98.579502)):
            Circle(F0_R_3, mode=Mode.SUBTRACT)
        with Locations((40.674363, 105.009502)):
            Circle(F0_R_2, mode=Mode.SUBTRACT)
        with Locations((61.844363, 98.579502)):
            Circle(F0_R_3, mode=Mode.SUBTRACT)
        with Locations((38.274363, 75.009502)):
            Circle(F0_R_4)
        with Locations((38.274363, 75.009502)):
            Circle(F0_R_5, mode=Mode.SUBTRACT)
        with Locations((38.274363, 75.009502)):
            Circle(F0_R_5)
        with Locations((38.274363, 75.009502)):
            Circle(F0_R_6, mode=Mode.SUBTRACT)
    extrude(amount=F4_DEPTH)

    # F0 (on Front) → F5 (cut)
    with BuildSketch(Plane.XZ):
        with Locations((38.274363, 75.009502)):
            Circle(F0_R_5)
        with Locations((38.274363, 75.009502)):
            Circle(F0_R_6, mode=Mode.SUBTRACT)
    extrude(amount=F5_DEPTH, mode=Mode.SUBTRACT)

    # F0 (on Front) → F6 (cut)
    with BuildSketch(Plane.XZ):
        with Locations((38.274363, 75.009502)):
            Circle(F0_R_4)
        with Locations((38.274363, 75.009502)):
            Circle(F0_R_5, mode=Mode.SUBTRACT)
    extrude(amount=F6_DEPTH, mode=Mode.SUBTRACT)


solid = Compound([f1.part, f4.part])
